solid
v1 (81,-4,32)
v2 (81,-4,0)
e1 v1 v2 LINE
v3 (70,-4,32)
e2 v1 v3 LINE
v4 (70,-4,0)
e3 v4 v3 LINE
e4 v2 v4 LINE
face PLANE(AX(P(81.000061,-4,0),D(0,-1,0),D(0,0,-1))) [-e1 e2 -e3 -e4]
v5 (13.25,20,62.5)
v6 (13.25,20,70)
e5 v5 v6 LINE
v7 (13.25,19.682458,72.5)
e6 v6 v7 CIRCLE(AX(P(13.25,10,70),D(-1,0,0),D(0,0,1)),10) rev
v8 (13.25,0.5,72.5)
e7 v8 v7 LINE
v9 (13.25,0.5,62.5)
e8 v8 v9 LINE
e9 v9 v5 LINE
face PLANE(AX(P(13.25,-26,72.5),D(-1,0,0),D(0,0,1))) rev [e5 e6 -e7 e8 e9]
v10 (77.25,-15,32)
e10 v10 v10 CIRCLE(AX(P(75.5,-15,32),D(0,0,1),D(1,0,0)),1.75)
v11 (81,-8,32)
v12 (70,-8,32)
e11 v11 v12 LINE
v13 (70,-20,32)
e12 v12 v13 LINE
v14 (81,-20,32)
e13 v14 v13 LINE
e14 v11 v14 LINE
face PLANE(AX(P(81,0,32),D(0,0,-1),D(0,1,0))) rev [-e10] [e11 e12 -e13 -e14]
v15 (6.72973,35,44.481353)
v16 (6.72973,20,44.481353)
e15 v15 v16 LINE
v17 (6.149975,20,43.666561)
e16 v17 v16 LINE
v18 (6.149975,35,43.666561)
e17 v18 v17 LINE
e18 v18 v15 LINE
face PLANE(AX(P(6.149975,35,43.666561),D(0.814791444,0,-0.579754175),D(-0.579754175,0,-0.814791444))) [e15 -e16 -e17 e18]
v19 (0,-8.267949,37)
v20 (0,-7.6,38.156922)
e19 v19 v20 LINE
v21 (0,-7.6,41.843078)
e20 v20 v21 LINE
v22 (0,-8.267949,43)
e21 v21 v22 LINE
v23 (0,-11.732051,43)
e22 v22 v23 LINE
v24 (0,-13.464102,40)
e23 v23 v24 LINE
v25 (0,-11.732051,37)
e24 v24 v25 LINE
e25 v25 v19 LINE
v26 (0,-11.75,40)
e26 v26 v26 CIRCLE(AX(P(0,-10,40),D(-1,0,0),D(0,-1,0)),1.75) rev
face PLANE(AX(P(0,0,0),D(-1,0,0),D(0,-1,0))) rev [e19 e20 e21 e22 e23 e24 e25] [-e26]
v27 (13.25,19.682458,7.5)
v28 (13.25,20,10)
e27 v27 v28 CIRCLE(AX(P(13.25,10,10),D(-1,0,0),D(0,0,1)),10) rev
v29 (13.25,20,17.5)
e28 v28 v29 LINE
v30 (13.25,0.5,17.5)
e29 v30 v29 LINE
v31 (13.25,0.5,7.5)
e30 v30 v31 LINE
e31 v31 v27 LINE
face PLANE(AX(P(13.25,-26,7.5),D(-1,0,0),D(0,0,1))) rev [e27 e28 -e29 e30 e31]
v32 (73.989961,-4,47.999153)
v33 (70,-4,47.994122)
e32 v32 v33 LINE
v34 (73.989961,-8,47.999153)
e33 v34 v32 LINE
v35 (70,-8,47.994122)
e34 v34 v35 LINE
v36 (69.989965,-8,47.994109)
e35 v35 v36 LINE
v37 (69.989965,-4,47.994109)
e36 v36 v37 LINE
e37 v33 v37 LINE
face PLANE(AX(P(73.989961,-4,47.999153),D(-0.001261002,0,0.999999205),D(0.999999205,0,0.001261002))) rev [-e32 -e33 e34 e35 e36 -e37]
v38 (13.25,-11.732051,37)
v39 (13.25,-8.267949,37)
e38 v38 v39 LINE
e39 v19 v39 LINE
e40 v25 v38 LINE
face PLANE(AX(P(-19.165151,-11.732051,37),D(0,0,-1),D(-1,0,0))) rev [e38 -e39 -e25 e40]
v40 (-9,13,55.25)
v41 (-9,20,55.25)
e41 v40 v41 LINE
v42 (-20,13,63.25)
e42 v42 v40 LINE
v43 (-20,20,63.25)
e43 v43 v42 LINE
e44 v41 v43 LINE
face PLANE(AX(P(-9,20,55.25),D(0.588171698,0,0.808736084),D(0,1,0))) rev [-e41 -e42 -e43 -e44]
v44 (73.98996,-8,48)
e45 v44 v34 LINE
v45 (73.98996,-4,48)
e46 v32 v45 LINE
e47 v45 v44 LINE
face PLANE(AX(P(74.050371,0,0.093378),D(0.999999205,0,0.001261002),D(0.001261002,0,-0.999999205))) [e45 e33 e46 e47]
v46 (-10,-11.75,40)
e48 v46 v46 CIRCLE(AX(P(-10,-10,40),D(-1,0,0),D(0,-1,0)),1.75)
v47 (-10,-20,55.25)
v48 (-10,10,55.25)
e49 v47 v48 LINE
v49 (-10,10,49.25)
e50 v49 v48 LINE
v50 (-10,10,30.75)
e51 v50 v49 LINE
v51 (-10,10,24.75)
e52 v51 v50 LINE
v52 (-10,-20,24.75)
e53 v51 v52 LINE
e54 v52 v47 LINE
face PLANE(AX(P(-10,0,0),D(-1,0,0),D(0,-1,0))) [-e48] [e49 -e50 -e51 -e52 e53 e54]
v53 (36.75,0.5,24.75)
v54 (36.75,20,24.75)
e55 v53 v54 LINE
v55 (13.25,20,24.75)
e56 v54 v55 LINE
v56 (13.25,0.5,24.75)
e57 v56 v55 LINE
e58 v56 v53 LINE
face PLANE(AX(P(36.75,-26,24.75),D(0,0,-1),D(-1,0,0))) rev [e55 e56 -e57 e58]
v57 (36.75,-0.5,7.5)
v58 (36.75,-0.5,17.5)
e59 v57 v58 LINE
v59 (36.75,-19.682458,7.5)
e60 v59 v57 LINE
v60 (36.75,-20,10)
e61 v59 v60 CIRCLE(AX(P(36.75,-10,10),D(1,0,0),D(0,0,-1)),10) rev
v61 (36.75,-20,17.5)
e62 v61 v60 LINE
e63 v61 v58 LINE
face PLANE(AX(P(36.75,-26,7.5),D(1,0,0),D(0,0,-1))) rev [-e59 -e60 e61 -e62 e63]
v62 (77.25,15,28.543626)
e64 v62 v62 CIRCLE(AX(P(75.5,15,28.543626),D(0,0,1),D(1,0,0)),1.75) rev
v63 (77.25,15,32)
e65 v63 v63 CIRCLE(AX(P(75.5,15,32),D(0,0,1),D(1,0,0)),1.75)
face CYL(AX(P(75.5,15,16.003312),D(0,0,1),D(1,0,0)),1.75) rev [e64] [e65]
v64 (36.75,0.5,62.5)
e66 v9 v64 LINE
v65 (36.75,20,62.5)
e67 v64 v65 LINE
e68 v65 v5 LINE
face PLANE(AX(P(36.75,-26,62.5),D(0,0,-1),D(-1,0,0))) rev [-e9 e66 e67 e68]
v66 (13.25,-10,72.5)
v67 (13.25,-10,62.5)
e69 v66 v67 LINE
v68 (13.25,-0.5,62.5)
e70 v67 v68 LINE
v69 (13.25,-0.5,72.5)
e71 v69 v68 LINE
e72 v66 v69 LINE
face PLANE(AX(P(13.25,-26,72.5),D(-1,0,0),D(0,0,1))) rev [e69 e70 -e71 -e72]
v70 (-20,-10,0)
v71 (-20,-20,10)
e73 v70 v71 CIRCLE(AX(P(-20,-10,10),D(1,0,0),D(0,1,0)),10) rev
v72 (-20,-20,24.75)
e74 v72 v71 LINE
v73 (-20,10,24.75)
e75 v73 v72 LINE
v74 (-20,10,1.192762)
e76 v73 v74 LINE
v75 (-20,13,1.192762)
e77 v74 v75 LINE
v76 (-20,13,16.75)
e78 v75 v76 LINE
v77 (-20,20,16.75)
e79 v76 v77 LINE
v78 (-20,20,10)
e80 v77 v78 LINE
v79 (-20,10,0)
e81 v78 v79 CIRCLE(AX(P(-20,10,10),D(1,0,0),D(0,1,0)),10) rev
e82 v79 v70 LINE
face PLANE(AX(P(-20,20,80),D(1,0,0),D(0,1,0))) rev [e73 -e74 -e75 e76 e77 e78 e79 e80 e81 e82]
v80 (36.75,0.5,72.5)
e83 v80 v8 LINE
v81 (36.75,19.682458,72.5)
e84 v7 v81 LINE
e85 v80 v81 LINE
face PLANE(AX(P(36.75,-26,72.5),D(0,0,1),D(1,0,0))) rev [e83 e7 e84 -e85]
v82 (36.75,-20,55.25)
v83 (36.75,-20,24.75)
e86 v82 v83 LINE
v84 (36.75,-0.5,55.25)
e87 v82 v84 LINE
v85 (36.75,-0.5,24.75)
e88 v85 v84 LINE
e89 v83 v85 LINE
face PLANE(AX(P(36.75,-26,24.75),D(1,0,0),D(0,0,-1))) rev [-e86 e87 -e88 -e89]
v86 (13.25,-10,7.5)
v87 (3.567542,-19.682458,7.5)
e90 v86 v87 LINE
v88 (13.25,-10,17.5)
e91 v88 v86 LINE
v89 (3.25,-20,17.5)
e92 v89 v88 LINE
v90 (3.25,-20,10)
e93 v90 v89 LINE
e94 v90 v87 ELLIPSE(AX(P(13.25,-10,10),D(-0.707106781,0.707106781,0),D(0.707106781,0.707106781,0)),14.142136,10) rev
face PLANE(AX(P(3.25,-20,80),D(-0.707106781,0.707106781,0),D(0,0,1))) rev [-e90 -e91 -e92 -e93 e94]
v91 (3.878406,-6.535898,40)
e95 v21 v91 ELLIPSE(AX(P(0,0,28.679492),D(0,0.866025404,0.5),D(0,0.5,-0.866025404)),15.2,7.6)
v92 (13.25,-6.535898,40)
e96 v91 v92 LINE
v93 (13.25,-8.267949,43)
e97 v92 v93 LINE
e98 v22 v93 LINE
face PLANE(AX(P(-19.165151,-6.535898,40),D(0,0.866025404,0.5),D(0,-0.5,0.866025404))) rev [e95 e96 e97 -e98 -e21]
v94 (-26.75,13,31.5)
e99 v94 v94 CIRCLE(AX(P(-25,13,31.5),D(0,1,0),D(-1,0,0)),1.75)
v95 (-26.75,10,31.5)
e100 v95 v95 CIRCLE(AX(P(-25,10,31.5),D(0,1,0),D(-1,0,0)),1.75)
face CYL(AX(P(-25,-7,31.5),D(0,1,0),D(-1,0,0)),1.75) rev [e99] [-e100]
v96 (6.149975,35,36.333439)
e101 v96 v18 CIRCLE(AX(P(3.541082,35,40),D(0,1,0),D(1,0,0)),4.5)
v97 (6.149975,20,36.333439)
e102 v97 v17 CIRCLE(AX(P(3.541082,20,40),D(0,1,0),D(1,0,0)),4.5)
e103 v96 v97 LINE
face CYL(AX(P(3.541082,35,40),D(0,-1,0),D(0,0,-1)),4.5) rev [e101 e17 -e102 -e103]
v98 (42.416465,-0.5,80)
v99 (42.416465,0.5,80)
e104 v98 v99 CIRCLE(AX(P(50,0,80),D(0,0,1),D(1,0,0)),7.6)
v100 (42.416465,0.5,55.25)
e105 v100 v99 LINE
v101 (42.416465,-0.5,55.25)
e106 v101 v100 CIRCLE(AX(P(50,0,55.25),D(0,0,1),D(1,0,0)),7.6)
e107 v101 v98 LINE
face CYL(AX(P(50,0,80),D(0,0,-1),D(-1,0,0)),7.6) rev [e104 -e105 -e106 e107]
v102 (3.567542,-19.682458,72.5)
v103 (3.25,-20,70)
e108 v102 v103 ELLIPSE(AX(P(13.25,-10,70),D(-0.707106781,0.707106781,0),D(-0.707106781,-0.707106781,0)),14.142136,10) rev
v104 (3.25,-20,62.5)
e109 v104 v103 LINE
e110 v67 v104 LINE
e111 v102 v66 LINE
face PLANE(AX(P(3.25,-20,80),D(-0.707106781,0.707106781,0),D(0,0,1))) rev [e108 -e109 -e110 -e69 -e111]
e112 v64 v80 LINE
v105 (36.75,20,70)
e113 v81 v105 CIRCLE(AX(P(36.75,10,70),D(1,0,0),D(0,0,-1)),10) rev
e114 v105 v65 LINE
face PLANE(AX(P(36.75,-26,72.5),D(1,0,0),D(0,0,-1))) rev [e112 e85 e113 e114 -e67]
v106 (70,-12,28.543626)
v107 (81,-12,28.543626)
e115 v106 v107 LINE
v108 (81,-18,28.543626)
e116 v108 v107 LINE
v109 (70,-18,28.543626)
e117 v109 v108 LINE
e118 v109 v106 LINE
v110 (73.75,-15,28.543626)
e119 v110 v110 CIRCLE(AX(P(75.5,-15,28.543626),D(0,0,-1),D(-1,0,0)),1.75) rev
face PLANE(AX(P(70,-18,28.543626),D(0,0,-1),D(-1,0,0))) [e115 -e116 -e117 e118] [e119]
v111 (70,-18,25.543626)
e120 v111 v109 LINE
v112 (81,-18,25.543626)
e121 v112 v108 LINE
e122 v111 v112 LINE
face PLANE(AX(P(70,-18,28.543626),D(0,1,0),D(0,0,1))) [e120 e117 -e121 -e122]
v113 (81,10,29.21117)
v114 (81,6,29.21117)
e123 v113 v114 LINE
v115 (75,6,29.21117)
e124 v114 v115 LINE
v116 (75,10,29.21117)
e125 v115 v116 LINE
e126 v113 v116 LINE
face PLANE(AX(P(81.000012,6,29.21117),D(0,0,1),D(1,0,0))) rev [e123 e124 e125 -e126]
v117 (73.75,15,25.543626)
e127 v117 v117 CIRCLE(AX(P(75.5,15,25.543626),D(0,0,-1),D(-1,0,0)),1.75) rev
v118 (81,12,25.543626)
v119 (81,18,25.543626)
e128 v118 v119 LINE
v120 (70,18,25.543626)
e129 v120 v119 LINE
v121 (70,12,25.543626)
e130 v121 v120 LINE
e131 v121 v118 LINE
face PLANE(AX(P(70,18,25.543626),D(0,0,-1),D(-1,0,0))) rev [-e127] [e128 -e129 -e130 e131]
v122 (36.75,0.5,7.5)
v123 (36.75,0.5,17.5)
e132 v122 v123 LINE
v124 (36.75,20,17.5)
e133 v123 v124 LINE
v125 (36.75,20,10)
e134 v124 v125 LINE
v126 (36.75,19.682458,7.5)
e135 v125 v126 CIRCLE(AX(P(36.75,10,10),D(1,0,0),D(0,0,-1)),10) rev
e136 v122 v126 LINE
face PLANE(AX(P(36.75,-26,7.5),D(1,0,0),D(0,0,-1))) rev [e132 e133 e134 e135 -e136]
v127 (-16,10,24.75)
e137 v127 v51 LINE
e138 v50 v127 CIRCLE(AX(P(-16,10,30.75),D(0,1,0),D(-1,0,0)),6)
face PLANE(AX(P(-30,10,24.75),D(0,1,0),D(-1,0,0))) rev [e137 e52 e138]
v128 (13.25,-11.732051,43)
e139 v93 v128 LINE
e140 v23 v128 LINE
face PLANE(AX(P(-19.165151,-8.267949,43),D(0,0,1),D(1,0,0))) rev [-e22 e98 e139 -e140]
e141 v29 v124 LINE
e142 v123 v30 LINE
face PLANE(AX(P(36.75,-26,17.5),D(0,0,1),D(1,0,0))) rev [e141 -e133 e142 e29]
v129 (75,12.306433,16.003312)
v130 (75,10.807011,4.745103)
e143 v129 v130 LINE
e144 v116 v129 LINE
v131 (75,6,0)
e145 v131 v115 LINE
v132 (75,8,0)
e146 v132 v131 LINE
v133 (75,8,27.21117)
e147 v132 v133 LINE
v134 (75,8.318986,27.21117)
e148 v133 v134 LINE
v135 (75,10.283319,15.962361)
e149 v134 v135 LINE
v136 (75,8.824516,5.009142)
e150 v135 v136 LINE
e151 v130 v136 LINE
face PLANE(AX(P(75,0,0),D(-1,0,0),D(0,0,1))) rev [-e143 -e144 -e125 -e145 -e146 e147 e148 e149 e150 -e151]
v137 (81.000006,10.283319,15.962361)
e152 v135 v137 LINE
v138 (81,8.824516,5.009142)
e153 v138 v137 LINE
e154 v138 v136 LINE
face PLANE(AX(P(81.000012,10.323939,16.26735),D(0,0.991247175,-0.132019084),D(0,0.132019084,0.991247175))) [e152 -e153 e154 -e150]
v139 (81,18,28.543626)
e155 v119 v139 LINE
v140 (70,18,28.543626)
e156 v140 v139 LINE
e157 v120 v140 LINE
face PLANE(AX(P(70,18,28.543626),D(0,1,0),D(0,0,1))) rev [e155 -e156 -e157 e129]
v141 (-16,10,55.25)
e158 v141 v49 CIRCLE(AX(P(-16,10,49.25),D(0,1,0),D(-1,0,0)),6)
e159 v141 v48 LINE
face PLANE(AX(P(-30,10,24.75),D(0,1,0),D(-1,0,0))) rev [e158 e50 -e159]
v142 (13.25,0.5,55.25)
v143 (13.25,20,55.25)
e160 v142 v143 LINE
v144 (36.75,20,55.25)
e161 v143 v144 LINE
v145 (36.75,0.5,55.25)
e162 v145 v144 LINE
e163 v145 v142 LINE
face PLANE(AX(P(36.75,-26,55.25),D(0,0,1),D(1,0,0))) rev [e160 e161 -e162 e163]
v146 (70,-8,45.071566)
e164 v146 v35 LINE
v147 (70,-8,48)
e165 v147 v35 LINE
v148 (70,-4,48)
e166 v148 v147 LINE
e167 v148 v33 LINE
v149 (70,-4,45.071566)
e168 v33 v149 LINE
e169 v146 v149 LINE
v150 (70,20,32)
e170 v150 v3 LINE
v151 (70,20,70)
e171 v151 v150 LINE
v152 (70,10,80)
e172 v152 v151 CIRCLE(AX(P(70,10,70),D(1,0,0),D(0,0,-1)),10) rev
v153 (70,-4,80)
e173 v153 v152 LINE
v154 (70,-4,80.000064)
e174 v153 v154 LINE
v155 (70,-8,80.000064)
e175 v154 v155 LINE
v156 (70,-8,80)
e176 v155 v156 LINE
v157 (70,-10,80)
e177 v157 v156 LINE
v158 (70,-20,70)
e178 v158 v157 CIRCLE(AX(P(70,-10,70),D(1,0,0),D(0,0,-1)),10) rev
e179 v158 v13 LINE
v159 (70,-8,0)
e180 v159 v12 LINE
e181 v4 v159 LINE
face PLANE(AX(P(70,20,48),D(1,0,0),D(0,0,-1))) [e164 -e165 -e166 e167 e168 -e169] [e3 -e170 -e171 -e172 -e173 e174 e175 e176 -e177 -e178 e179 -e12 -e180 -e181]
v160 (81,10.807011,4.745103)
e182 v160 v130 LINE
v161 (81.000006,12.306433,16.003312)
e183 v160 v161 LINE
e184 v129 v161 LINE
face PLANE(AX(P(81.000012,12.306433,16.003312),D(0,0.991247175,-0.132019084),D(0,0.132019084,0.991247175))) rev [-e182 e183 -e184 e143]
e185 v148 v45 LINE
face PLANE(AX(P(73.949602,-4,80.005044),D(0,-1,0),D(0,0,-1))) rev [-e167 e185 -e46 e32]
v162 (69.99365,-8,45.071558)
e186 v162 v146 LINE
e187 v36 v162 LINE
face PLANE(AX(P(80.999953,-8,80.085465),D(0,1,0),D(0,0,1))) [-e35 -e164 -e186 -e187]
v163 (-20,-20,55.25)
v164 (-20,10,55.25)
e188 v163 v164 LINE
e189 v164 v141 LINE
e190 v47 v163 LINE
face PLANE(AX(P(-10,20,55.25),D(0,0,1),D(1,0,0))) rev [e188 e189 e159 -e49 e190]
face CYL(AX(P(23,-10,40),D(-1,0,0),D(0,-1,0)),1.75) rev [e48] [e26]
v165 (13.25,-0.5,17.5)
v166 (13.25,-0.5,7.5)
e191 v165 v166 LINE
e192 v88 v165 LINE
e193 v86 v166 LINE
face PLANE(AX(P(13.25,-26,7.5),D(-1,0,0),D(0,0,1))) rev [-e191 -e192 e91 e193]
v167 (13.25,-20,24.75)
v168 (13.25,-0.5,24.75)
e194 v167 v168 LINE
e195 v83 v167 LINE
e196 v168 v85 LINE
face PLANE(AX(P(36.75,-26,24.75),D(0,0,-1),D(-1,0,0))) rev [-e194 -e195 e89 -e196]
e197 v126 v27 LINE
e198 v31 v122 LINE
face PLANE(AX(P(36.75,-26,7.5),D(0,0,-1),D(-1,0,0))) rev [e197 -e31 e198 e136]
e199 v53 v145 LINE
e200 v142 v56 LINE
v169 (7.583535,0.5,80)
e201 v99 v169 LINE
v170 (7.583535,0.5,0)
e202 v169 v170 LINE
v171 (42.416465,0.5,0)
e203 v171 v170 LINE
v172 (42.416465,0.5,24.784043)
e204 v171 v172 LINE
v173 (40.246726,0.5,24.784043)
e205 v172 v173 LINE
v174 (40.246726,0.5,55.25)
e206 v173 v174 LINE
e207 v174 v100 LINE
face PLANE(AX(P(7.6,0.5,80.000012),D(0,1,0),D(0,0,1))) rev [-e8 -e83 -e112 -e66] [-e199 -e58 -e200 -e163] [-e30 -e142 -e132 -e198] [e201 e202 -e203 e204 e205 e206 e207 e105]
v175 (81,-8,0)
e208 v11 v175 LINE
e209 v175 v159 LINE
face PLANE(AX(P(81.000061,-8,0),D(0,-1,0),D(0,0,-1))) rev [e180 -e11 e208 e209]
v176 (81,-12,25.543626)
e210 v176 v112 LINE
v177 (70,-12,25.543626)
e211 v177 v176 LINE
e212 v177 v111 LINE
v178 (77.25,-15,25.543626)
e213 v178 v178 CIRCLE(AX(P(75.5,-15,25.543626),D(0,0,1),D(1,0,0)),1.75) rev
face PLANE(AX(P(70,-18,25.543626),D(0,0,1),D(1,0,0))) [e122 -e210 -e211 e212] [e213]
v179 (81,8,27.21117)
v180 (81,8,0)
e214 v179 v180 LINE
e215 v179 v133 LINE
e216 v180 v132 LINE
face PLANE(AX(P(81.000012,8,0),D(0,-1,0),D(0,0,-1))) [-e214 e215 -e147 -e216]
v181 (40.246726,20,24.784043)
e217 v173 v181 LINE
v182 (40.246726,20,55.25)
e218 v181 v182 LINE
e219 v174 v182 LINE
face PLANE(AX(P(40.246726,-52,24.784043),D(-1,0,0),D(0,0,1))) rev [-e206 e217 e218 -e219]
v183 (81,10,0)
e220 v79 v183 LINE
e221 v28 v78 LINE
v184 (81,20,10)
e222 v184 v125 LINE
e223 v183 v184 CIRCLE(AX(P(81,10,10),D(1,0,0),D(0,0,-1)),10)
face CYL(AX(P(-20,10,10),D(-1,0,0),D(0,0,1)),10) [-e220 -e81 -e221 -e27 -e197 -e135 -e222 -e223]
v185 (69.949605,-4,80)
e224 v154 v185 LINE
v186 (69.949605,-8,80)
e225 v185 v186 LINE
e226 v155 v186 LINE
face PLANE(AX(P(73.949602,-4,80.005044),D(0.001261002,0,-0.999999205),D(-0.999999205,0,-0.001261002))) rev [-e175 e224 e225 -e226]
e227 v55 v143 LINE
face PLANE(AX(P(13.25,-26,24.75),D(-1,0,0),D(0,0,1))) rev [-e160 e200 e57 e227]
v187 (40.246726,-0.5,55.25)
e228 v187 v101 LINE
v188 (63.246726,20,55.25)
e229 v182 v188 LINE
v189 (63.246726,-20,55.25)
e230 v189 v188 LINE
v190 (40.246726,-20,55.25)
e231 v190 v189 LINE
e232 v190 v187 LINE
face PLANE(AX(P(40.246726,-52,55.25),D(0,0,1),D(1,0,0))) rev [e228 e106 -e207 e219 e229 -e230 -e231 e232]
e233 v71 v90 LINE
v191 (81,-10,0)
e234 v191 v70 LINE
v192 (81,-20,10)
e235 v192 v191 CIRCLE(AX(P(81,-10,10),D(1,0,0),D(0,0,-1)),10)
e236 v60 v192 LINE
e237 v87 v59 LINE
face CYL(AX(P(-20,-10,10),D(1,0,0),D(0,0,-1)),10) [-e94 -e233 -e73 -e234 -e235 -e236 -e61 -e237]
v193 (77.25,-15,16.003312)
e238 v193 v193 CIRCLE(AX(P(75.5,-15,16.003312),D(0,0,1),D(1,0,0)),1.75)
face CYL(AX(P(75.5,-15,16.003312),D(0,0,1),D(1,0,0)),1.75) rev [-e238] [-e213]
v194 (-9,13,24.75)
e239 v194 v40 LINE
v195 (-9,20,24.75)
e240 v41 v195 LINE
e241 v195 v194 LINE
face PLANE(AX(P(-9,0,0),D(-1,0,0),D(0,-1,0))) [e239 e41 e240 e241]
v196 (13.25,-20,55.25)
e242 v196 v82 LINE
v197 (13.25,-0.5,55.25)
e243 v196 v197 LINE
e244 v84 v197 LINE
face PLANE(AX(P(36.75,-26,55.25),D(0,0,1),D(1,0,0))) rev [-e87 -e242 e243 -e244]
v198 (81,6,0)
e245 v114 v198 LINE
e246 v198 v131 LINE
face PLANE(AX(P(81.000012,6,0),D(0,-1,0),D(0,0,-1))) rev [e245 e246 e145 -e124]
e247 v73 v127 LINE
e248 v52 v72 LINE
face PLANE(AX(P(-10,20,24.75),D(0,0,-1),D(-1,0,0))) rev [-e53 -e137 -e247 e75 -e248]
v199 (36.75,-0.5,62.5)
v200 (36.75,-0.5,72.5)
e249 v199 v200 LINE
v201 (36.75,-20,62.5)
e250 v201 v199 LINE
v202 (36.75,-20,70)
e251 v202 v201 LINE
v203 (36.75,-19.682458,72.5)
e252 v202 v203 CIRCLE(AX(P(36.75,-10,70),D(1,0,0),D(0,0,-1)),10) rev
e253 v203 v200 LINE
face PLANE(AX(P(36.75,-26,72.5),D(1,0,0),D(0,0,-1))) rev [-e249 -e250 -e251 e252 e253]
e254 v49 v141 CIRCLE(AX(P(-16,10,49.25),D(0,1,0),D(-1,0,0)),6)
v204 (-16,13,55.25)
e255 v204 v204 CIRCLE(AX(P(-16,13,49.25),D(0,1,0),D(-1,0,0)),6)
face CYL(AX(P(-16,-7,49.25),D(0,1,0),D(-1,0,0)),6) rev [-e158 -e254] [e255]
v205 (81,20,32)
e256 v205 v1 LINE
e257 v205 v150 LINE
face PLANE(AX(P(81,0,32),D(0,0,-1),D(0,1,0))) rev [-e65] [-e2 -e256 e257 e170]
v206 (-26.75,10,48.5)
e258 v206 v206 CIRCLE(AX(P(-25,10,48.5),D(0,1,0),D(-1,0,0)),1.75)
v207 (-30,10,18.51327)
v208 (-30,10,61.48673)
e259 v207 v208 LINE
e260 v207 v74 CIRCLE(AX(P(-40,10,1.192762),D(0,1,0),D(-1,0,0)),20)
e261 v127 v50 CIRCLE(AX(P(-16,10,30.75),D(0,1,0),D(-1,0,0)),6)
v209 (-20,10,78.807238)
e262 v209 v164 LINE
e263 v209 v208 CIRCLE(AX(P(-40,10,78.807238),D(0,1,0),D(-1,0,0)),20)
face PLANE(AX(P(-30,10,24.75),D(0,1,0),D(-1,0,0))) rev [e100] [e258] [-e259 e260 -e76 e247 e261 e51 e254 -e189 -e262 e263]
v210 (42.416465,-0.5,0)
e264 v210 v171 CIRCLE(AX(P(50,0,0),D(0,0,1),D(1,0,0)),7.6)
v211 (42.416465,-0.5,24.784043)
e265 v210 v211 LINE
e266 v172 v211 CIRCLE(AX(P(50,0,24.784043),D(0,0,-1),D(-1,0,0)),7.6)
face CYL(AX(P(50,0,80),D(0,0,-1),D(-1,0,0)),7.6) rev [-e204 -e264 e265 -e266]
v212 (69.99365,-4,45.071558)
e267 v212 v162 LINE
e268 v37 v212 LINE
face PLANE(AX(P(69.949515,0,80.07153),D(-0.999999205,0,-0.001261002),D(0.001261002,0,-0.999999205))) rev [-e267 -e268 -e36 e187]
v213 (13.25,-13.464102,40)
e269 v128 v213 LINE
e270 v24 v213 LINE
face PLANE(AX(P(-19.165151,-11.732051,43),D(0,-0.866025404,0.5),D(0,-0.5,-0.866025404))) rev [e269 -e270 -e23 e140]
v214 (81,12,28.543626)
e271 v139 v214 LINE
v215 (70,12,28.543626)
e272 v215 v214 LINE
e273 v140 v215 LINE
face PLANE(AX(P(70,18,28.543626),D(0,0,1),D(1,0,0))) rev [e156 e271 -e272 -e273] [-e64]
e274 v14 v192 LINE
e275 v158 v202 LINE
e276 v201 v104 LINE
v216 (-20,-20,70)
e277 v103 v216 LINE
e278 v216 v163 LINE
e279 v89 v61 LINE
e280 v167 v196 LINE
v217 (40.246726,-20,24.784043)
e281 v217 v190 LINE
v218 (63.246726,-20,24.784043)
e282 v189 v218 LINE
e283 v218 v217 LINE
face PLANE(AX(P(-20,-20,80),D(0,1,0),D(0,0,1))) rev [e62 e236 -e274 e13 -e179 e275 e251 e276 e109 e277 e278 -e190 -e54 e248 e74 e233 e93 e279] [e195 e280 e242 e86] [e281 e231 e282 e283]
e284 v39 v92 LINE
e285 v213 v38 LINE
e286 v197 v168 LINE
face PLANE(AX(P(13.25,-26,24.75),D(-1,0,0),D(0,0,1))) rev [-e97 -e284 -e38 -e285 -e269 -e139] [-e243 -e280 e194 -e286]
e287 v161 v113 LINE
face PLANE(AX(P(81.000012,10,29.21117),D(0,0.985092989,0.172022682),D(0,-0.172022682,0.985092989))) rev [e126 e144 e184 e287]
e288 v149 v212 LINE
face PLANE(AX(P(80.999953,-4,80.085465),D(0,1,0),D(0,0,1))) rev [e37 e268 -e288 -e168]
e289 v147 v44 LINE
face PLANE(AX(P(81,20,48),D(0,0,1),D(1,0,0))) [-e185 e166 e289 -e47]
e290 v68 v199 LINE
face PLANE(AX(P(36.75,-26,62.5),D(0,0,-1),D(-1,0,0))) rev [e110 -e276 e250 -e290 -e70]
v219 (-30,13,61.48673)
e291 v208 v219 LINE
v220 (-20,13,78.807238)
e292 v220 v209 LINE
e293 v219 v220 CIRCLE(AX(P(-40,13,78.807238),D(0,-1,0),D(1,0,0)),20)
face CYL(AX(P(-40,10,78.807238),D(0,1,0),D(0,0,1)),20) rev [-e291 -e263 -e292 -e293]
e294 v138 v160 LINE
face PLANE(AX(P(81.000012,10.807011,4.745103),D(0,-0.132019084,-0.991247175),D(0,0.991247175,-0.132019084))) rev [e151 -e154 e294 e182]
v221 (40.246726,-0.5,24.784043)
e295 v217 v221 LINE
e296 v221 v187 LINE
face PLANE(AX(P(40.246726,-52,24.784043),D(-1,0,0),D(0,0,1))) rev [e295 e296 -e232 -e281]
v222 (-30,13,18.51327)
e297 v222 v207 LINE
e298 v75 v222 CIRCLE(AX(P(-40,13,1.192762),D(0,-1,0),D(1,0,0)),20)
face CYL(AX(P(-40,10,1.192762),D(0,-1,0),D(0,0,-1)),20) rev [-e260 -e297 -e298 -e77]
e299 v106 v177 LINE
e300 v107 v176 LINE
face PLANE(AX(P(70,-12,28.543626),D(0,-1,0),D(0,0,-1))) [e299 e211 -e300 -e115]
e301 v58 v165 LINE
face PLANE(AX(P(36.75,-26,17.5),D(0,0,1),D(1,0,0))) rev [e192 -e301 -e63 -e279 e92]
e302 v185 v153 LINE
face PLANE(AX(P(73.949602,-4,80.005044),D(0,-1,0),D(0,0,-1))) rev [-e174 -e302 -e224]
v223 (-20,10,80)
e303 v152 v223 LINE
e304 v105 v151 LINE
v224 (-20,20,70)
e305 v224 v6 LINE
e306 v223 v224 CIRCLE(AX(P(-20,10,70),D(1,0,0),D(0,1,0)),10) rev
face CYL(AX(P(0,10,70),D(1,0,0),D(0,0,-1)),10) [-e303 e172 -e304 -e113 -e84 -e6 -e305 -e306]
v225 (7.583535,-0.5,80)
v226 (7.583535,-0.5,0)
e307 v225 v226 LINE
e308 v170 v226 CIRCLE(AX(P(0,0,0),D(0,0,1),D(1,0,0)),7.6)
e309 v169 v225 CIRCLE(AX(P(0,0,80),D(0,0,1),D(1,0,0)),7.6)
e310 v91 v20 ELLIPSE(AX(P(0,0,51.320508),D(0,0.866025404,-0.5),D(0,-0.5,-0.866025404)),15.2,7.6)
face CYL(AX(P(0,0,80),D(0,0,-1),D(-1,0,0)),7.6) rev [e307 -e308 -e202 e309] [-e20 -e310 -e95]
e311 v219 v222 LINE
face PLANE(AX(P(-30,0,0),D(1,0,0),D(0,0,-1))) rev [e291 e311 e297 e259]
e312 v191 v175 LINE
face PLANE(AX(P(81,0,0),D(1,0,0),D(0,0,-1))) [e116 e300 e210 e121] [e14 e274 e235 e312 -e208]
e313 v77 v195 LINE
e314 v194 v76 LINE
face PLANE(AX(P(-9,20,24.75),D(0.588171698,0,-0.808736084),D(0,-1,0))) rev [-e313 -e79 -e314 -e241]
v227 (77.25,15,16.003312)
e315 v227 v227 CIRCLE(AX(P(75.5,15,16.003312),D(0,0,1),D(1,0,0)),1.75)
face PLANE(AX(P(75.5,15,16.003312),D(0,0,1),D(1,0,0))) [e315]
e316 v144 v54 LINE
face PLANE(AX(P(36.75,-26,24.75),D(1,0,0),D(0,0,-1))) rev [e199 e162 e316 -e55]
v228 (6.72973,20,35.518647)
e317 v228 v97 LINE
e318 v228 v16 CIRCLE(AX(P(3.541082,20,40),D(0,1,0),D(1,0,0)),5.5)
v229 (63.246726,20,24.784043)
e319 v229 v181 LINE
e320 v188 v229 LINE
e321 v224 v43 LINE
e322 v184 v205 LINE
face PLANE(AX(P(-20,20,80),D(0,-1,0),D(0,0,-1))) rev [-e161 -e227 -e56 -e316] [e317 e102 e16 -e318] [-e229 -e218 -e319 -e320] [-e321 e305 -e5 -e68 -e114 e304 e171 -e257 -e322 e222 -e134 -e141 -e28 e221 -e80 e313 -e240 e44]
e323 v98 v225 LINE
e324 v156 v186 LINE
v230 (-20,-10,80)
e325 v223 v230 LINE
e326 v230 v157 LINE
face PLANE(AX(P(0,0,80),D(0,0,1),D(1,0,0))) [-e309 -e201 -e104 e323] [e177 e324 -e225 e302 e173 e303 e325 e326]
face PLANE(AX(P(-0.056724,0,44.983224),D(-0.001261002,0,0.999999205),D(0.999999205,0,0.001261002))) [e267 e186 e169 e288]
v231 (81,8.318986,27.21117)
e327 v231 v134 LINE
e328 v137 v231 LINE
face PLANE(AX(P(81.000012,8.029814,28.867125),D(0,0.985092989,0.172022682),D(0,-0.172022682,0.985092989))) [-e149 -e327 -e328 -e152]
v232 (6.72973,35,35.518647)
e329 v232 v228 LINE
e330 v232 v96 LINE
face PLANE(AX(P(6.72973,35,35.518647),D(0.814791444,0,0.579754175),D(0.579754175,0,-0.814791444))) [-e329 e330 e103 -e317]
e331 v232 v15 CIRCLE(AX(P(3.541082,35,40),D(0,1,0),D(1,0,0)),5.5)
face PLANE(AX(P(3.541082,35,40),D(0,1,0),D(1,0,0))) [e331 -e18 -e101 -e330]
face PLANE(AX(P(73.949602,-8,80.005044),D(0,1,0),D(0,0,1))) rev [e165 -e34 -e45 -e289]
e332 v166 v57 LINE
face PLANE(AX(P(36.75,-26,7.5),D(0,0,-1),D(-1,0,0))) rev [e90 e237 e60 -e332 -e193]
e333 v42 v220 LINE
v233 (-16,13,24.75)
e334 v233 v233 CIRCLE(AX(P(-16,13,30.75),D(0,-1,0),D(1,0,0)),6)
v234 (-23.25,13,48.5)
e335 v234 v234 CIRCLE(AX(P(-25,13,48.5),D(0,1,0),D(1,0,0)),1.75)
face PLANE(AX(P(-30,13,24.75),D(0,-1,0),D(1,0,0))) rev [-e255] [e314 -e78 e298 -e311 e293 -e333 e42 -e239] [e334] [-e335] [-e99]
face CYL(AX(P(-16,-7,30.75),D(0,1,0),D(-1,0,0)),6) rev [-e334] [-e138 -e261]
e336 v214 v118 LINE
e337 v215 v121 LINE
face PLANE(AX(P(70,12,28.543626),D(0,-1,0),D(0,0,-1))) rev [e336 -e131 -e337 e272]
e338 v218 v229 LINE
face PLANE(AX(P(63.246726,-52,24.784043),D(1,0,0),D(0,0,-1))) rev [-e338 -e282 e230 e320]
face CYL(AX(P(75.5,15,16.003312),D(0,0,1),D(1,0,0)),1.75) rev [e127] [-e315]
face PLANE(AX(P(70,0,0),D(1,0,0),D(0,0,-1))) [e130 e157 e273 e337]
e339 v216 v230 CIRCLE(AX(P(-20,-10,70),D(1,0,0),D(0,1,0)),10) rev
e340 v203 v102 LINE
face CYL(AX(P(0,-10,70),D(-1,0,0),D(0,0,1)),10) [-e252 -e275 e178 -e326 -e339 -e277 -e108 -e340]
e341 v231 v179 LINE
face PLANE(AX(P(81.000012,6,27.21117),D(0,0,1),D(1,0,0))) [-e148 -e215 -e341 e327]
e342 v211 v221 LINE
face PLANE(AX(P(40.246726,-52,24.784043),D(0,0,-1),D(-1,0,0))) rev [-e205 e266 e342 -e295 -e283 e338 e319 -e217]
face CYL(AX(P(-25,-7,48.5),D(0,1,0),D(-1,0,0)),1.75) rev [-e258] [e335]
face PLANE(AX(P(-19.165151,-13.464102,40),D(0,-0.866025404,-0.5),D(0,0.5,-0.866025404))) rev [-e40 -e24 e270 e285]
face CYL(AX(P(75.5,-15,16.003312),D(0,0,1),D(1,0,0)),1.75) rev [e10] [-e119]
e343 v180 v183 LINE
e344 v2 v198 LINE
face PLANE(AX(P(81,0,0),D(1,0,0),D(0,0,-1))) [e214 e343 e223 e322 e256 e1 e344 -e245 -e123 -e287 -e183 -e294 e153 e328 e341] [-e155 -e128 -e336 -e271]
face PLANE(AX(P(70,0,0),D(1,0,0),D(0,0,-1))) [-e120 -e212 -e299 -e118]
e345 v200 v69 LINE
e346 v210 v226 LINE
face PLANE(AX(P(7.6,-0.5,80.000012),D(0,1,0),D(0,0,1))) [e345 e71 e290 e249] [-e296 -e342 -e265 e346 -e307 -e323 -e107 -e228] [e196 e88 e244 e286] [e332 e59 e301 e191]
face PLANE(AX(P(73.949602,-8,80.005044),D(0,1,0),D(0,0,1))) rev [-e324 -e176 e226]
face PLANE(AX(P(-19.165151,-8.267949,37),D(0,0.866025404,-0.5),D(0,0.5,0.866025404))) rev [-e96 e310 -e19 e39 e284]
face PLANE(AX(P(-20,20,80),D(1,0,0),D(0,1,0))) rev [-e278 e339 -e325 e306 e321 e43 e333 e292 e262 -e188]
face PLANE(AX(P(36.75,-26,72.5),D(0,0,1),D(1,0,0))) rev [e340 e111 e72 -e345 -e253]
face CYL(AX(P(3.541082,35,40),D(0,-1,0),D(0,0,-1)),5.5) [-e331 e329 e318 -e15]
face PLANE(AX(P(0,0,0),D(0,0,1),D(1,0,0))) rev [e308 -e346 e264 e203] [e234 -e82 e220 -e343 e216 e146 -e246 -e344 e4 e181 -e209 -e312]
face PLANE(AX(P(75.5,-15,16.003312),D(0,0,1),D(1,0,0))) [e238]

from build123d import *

# Parameters (mm, degrees)
SKETCH1_W                    = 90
SKETCH1_H                    = 40
SKETCH1_R                    = 7.6
BOSS_EXTRUDE1_DEPTH          = 80
SKETCH2_W                    = 30.5
SKETCH2_H                    = 40
CUT_EXTRUDE1_DEPTH           = 10
SKETCH3_W                    = 23.5
SKETCH3_H                    = 30.5
SKETCH3_H_2                  = 10
CUT_EXTRUDE2_DEPTH           = 46
CHAMFER1_SIZE                = 10
SKETCH4_W                    = 30.5
SKETCH4_H                    = 3
BOSS_EXTRUDE2_DEPTH          = 20
SKETCH5_R                    = 1.75
CUT_EXTRUDE3_DEPTH           = 20
SKETCH6_R                    = 6
CUT_EXTRUDE4_DEPTH           = 20
SKETCH8_W                    = 30.5
SKETCH8_H                    = 7
CUT_EXTRUDE5_DEPTH           = 1
CHAMFER3_SIZE                = 8
CHAMFER3_SIZE_2              = 11
CHAMFER4_SIZE                = 8
CHAMFER4_SIZE_2              = 45.370254557
SKETCH9_R                    = 1.75
CUT_EXTRUDE6_DEPTH           = 33
CUT_EXTRUDE7_DEPTH           = 13.25
EXTRUDE_THIN1_DEPTH          = 15
FILLET1_R                    = 10
CUT_EXTRUDE_THIN1_DEPTH      = 112.915146428
CUT_EXTRUDE_THIN1_DEPTH_BACK = 95
FILLET2_START                = 10
FILLET2_DEPTH                = 3
BOSS_EXTRUDE3_DEPTH          = 11
CUT_EXTRUDE_THIN2_START      = -6
CUT_EXTRUDE_THIN2_DEPTH      = 148.230308362
CUT_EXTRUDE_THIN3_START      = -11
SKETCH15_W                   = 32
SKETCH15_H                   = 4
CUT_EXTRUDE_THIN3_DEPTH      = 153.230308362
SKETCH16_R                   = 1.75
CUT_EXTRUDE8_DEPTH           = 15.99669
SKETCH17_W                   = 3
SKETCH17_H                   = 6
CUT_EXTRUDE9_DEPTH           = 11
SKETCH18_W                   = 23
SKETCH18_H                   = 30.465957047
CUT_EXTRUDE10_DEPTH          = 72
SKETCH19_R                   = 3
CUT_EXTRUDE11_DEPTH          = 22
SKETCH25_W                   = 11.010141894
SKETCH25_H                   = 4
CUT_EXTRUDE13_DEPTH          = 3
SKETCH26_W                   = 32.00591654
SKETCH26_H                   = 4
BOSS_EXTRUDE4_DEPTH          = 4
SURFACE_EXTRUDE2_1_BACK      = 61
SURFACE_EXTRUDE2_1_DEPTH     = 61


with BuildPart() as part:
    # Sketch1 → Boss-Extrude1 (new body)
    with BuildSketch(Plane.XY):
        with Locations((25, 0)):
            Rectangle(SKETCH1_W, SKETCH1_H)
        Circle(SKETCH1_R, mode=Mode.SUBTRACT)
        with Locations((50, 0)):
            Circle(SKETCH1_R, mode=Mode.SUBTRACT)
    extrude(amount=BOSS_EXTRUDE1_DEPTH)

    # Sketch2 → Cut-Extrude1 (cut)
    with BuildSketch(Plane.ZY.offset(20)):
        with Locations((40, 0)):
            Rectangle(SKETCH2_W, SKETCH2_H)
    extrude(amount=-CUT_EXTRUDE1_DEPTH, mode=Mode.SUBTRACT)

    # Sketch3 → Cut-Extrude2 (cut)
    with BuildSketch(Plane(origin=(0, 20, 0), x_dir=(1, 0, 0), z_dir=(0, 1, 0))):
        with Locations((25, -40)):
            Rectangle(SKETCH3_W, SKETCH3_H)
        with Locations((25, -12.5)):
            Rectangle(SKETCH3_W, SKETCH3_H_2)
        with Locations((25, -67.5)):
            Rectangle(SKETCH3_W, SKETCH3_H_2)
    extrude(amount=-CUT_EXTRUDE2_DEPTH, mode=Mode.SUBTRACT)

    # Chamfer1
    chamfer1_edges = [part.edges().sort_by_distance(p)[0] for p in [
        (13.25, -20, 67.5),
        (13.25, -20, 12.5),
    ]]
    chamfer(chamfer1_edges, length=CHAMFER1_SIZE)

    # Sketch4 → Boss-Extrude2 (add)
    with BuildSketch(Plane.ZY.offset(10)):
        with Locations((40, 11.5)):
            Rectangle(SKETCH4_W, SKETCH4_H)
    extrude(amount=BOSS_EXTRUDE2_DEPTH)

    # Sketch5 → Cut-Extrude3 (cut)
    with BuildSketch(Plane(origin=(0, 13, 0), x_dir=(1, 0, 0), z_dir=(0, 1, 0))):
        with Locations(Location((-25, -31.5, 0), (0, 0, 180))):
            Circle(SKETCH5_R)
        with Locations(Location((-25, -48.5, 0), (0, 0, 180))):
            Circle(SKETCH5_R)
    extrude(amount=-CUT_EXTRUDE3_DEPTH, mode=Mode.SUBTRACT)

    # Sketch6 → Cut-Extrude4 (cut)
    with BuildSketch(Plane(origin=(0, 13, 0), x_dir=(1, 0, 0), z_dir=(0, 1, 0))):
        with Locations(Location((-16, -30.75, 0), (0, 0, 90))):
            Circle(SKETCH6_R)
        with Locations(Location((-16, -49.25, 0), (0, 0, 270))):
            Circle(SKETCH6_R)
    extrude(amount=-CUT_EXTRUDE4_DEPTH, mode=Mode.SUBTRACT)

    # Sketch8 → Cut-Extrude5 (cut)
    with BuildSketch(Plane.ZY.offset(10)):
        with Locations((40, 16.5)):
            Rectangle(SKETCH8_W, SKETCH8_H)
    extrude(amount=-CUT_EXTRUDE5_DEPTH, mode=Mode.SUBTRACT)

    # Chamfer3
    # the kernel refuses this chamfer: 11, 8 mm, written as the material it takes off along each edge
    with BuildSketch(Plane(origin=(-20, 48.396981056, 55.25), x_dir=(0, 0, 1), z_dir=(0, -1, 0))) as chamfer3_piece_1:
        Polygon((CHAMFER3_SIZE, 0), (0, -CHAMFER3_SIZE_2), (0, 0), align=None)
    extrude(amount=35.396981056, mode=Mode.SUBTRACT)
    with BuildSketch(Plane(origin=(-20, 13, 24.75), x_dir=(1, 0, 0), z_dir=(0, 1, 0))) as chamfer3_piece_2:
        Polygon((CHAMFER3_SIZE_2, 0), (0, CHAMFER3_SIZE), (0, 0), align=None)
    extrude(amount=35.396981056, mode=Mode.SUBTRACT)

    # Chamfer4
    # the kernel refuses this chamfer: 45.370254557, 8 mm, written as the material it adds along each edge
    with BuildSketch(Plane(origin=(-20, 13, 55.25), x_dir=(0, 0, 1), z_dir=(0, -1, 0))) as chamfer4_piece_1_section:
        Polygon((CHAMFER4_SIZE, 0), (0, CHAMFER4_SIZE_2), (0, 0), align=None)
    chamfer4_piece_1 = extrude(amount=3, mode=Mode.PRIVATE)
    chamfer4_piece_1 = split(chamfer4_piece_1, bisect_by=Plane(origin=(-30, 13, 55.25), z_dir=(1, 0, 0)), keep=Keep.TOP, mode=Mode.PRIVATE)
    add(chamfer4_piece_1)
    # the kernel refuses this chamfer: 45.370254557, 8 mm, written as the material it adds along each edge
    with BuildSketch(Plane(origin=(-20, 10, 24.75), x_dir=(0, 0, -1), z_dir=(0, 1, 0))) as chamfer4_2_piece_1_section:
        Polygon((CHAMFER4_SIZE, 0), (0, CHAMFER4_SIZE_2), (0, 0), align=None)
    chamfer4_2_piece_1 = extrude(amount=3, mode=Mode.PRIVATE)
    chamfer4_2_piece_1 = split(chamfer4_2_piece_1, bisect_by=Plane(origin=(-30, 10, 24.75), z_dir=(1, 0, 0)), keep=Keep.TOP, mode=Mode.PRIVATE)
    add(chamfer4_2_piece_1)

    # Sketch9 → Cut-Extrude6 (cut)
    with BuildSketch(Plane.ZY.offset(10)):
        with Locations(Location((40, -10, 0), (0, 0, 270))):
            Circle(SKETCH9_R)
    extrude(amount=-CUT_EXTRUDE6_DEPTH, mode=Mode.SUBTRACT)

    # Sketch10 → Cut-Extrude7 (cut)
    with BuildSketch(Plane(origin=(13.25, 0, 0), x_dir=(0, 0, -1), z_dir=(1, 0, 0))):
        Polygon((-40, -13.464101615), (-37, -11.732050808), (-37, -8.267949192), (-40, -6.535898385), (-43, -8.267949192), (-43, -11.732050808), align=None)
    extrude(amount=-CUT_EXTRUDE7_DEPTH, mode=Mode.SUBTRACT)

    # Sketch11 → Extrude-Thin1 (add)
    with BuildSketch(Plane(origin=(0, 20, 0), x_dir=(1, 0, 0), z_dir=(0, 1, 0))):
        with BuildLine():
            ThreePointArc((6.729729503, -35.51864706), (-1.958918458, -40), (6.729729503, -44.48135294))
            Line((6.729729503, -44.48135294), (6.149975329, -43.666561497))
            ThreePointArc((6.149975329, -43.666561497), (-0.958918458, -40), (6.149975329, -36.333438503))
            Line((6.149975329, -36.333438503), (6.729729503, -35.51864706))
        make_face()
    extrude(amount=EXTRUDE_THIN1_DEPTH)

    # Fillet1
    # the kernel refuses this fillet: 10 mm, written as the material it takes off along each edge
    with BuildSketch(Plane(origin=(-45, 20, 80), x_dir=(0, 0, -1), z_dir=(1, 0, 0)), Plane(origin=(95, -20, 80), x_dir=(0, 0, -1), z_dir=(-1, 0, 0)), Plane(origin=(95, -20, 0), x_dir=(0, 1, 0), z_dir=(-1, 0, 0)), Plane(origin=(-45, 20, 0), x_dir=(0, -1, 0), z_dir=(1, 0, 0))) as fillet1_piece_1:
        with BuildLine():
            CenterArc((FILLET1_R, -FILLET1_R), FILLET1_R, 90, 90)
            Line((0, -FILLET1_R), (0, 0))
            Line((0, 0), (FILLET1_R, 0))
        make_face()
    extrude(amount=140, mode=Mode.SUBTRACT)

    # Sketch12 → Cut-Extrude-Thin1 (cut, two sides: drawn at the far end of the back side and taken through both)
    with BuildSketch(Plane.XY.offset(80).offset(-CUT_EXTRUDE_THIN1_DEPTH_BACK)):
        Polygon((3.119310539, -0.5), (7.6, -0.5), (42.4, -0.5), (46.98201893, -0.5), (46.98201893, 0.5), (42.4, 0.5), (7.6, 0.5), (3.119310539, 0.5), align=None)
    extrude(amount=CUT_EXTRUDE_THIN1_DEPTH + CUT_EXTRUDE_THIN1_DEPTH_BACK, mode=Mode.SUBTRACT)

    # Fillet2: read off the stored shape, not the designer's step
    # Fillet2 outline → Fillet2 (add)
    with BuildSketch(Plane(origin=(0, 0, 0), x_dir=(1, 0, 0), z_dir=(0, 1, 0)).offset(FILLET2_START)):
        with BuildLine():
            ThreePointArc((-30, -61.486730193), (-22.679491924, -68.807238269), (-20, -78.807238269))
            Line((-20, -78.807238269), (-20, -63.25))
            Line((-20, -63.25), (-30, -61.486730193))
        make_face()
        with BuildLine():
            Line((-20, -16.75), (-20, -1.192761731))
            ThreePointArc((-20, -1.192761731), (-22.679491924, -11.192761731), (-30, -18.513269807))
            Line((-30, -18.513269807), (-20, -16.75))
        make_face()
    extrude(amount=FILLET2_DEPTH)

    # Sketch13 → Boss-Extrude3 (add)
    with BuildSketch(Plane(origin=(70, 0, 0), x_dir=(0, 0, -1), z_dir=(1, 0, 0))):
        with BuildLine():
            Line((-10, 20), (-32, 20))
            Line((-32, 20), (-32, -20))
            Line((-32, -20), (-10, -20))
            ThreePointArc((-10, -20), (-2.928932188, -17.071067812), (0, -10))
            Line((0, -10), (0, 10))
            ThreePointArc((0, 10), (-2.928932188, 17.071067812), (-10, 20))
        make_face()
        with BuildLine():
            Line((-48, -20), (-48, 20))
            Line((-48, 20), (-70, 20))
            ThreePointArc((-70, 20), (-77.071067812, 17.071067812), (-80, 10))
            Line((-80, 10), (-80, -10))
            ThreePointArc((-80, -10), (-77.071067812, -17.071067812), (-70, -20))
            Line((-70, -20), (-48, -20))
        make_face()
    extrude(amount=BOSS_EXTRUDE3_DEPTH)

    # Sketch14 → Cut-Extrude-Thin2 (cut)
    with BuildSketch(Plane(origin=(81, 0, 0), x_dir=(0, 0, -1), z_dir=(1, 0, 0)).offset(CUT_EXTRUDE_THIN2_START)):
        Polygon((0, 6), (-29.211170014, 6), (-29.211170014, 10), (-16.003311772, 12.306433224), (-4.745103337, 10.807010671), (-5.009141506, 8.824516321), (-15.962361409, 10.283319029), (-27.211170014, 8.318986477), (-27.211170014, 8), (0, 8), align=None)
    cut_extrude_thin2 = extrude(amount=CUT_EXTRUDE_THIN2_DEPTH, mode=Mode.SUBTRACT)

    # Sketch15 → Cut-Extrude-Thin3 (cut)
    with BuildSketch(Plane(origin=(81, 0, 0), x_dir=(0, 0, -1), z_dir=(1, 0, 0)).offset(CUT_EXTRUDE_THIN3_START)):
        with Locations((-16, -6)):
            Rectangle(SKETCH15_W, SKETCH15_H)
    cut_extrude_thin3 = extrude(amount=CUT_EXTRUDE_THIN3_DEPTH, mode=Mode.SUBTRACT)

    # Sketch16 → Cut-Extrude8 (cut)
    with BuildSketch(Plane.XY.offset(32)):
        with Locations((75.5, 15)):
            Circle(SKETCH16_R)
        with Locations((75.5, -15)):
            Circle(SKETCH16_R)
    cut_extrude8 = extrude(amount=-CUT_EXTRUDE8_DEPTH, mode=Mode.SUBTRACT)

    # Sketch17 → Cut-Extrude9 (cut)
    with BuildSketch(Plane(origin=(81, 0, 0), x_dir=(0, 0, -1), z_dir=(1, 0, 0))):
        with Locations((-27.043626223, 15)):
            Rectangle(SKETCH17_W, SKETCH17_H)
    cut_extrude9 = extrude(amount=-CUT_EXTRUDE9_DEPTH, mode=Mode.SUBTRACT)

    # Mirror1: Cut-Extrude9 across plane
    add(cut_extrude9.mirror(Plane.ZX), mode=Mode.SUBTRACT)

    # Sketch18 → Cut-Extrude10 (cut)
    with BuildSketch(Plane(origin=(0, 20, 0), x_dir=(1, 0, 0), z_dir=(0, 1, 0))):
        with Locations((51.74672632, -40.017021476)):
            Rectangle(SKETCH18_W, SKETCH18_H)
    extrude(amount=-CUT_EXTRUDE10_DEPTH, mode=Mode.SUBTRACT)

    # Mirror4: Cut-Extrude-Thin2, Cut-Extrude-Thin3 across plane
    add(cut_extrude_thin2.mirror(Plane(origin=(-0.025214783, 0, 39.991629957), x_dir=(0.9999998012339909, 0, 0.0006305013708499051), z_dir=(0.0006305013708499051, 0, -0.999999801233991))), mode=Mode.SUBTRACT)
    add(cut_extrude_thin3.mirror(Plane(origin=(-0.025214783, 0, 39.991629957), x_dir=(0.9999998012339909, 0, 0.0006305013708499051), z_dir=(0.0006305013708499051, 0, -0.999999801233991))), mode=Mode.SUBTRACT)

    # Mirror5: Cut-Extrude8 across plane
    add(cut_extrude8.mirror(Plane(origin=(-0.025214783, 0, 39.991629957), x_dir=(0.9999998012339909, 0, 0.0006305013708499051), z_dir=(0.0006305013708499051, 0, -0.999999801233991))), mode=Mode.SUBTRACT)

    # Sketch19 → Cut-Extrude11 (cut)
    with BuildSketch(Plane.XY.offset(80)):
        with Locations((75.5, 15)):
            Circle(SKETCH19_R)
        with Locations((75.5, -15)):
            Circle(SKETCH19_R)
    extrude(amount=-CUT_EXTRUDE11_DEPTH, mode=Mode.SUBTRACT)

    # Sketch25 → Cut-Extrude13 (cut)
    with BuildSketch(Plane(origin=(-0.06050701, 0, 47.983221765), x_dir=(0.9999992049360428, 0, 0.0012610024910553283), z_dir=(-0.0012610024910553281, 0, 0.9999992049360427))):
        with Locations((75.555500512, -6)):
            Rectangle(SKETCH25_W, SKETCH25_H)
    extrude(amount=-CUT_EXTRUDE13_DEPTH, mode=Mode.SUBTRACT)

    # Sketch26 → Boss-Extrude4 (add)
    with BuildSketch(Plane(origin=(70.05037387, 0, 0.088333766), x_dir=(0.0012610024910553283, 0, -0.9999992049360428), z_dir=(0.9999992049360427, 0, 0.0012610024910553281))):
        with Locations((-63.908771499, -6)):
            Rectangle(SKETCH26_W, SKETCH26_H)
    extrude(amount=BOSS_EXTRUDE4_DEPTH)

    # Split2: cut with a surface, the side behind it stays
    # Surface-Extrude2: a surface, the sketch's curves swept straight by 61 mm
    with BuildLine(Plane(origin=(0, 20, 0), x_dir=(1, 0, 0), z_dir=(0, 1, 0)).offset(-SURFACE_EXTRUDE2_1_BACK), mode=Mode.PRIVATE) as surface_extrude2_1_path:
        Line((81, -48), (70, -48))
        Line((70, -48), (70, -104.300780198))
    surface_extrude2_1 = Shell.extrude(surface_extrude2_1_path.wire(), (0 * SURFACE_EXTRUDE2_1_DEPTH, 1 * SURFACE_EXTRUDE2_1_DEPTH, 0 * SURFACE_EXTRUDE2_1_DEPTH))
    split(bisect_by=surface_extrude2_1, keep=Keep.BOTTOM)


solid = part.part
